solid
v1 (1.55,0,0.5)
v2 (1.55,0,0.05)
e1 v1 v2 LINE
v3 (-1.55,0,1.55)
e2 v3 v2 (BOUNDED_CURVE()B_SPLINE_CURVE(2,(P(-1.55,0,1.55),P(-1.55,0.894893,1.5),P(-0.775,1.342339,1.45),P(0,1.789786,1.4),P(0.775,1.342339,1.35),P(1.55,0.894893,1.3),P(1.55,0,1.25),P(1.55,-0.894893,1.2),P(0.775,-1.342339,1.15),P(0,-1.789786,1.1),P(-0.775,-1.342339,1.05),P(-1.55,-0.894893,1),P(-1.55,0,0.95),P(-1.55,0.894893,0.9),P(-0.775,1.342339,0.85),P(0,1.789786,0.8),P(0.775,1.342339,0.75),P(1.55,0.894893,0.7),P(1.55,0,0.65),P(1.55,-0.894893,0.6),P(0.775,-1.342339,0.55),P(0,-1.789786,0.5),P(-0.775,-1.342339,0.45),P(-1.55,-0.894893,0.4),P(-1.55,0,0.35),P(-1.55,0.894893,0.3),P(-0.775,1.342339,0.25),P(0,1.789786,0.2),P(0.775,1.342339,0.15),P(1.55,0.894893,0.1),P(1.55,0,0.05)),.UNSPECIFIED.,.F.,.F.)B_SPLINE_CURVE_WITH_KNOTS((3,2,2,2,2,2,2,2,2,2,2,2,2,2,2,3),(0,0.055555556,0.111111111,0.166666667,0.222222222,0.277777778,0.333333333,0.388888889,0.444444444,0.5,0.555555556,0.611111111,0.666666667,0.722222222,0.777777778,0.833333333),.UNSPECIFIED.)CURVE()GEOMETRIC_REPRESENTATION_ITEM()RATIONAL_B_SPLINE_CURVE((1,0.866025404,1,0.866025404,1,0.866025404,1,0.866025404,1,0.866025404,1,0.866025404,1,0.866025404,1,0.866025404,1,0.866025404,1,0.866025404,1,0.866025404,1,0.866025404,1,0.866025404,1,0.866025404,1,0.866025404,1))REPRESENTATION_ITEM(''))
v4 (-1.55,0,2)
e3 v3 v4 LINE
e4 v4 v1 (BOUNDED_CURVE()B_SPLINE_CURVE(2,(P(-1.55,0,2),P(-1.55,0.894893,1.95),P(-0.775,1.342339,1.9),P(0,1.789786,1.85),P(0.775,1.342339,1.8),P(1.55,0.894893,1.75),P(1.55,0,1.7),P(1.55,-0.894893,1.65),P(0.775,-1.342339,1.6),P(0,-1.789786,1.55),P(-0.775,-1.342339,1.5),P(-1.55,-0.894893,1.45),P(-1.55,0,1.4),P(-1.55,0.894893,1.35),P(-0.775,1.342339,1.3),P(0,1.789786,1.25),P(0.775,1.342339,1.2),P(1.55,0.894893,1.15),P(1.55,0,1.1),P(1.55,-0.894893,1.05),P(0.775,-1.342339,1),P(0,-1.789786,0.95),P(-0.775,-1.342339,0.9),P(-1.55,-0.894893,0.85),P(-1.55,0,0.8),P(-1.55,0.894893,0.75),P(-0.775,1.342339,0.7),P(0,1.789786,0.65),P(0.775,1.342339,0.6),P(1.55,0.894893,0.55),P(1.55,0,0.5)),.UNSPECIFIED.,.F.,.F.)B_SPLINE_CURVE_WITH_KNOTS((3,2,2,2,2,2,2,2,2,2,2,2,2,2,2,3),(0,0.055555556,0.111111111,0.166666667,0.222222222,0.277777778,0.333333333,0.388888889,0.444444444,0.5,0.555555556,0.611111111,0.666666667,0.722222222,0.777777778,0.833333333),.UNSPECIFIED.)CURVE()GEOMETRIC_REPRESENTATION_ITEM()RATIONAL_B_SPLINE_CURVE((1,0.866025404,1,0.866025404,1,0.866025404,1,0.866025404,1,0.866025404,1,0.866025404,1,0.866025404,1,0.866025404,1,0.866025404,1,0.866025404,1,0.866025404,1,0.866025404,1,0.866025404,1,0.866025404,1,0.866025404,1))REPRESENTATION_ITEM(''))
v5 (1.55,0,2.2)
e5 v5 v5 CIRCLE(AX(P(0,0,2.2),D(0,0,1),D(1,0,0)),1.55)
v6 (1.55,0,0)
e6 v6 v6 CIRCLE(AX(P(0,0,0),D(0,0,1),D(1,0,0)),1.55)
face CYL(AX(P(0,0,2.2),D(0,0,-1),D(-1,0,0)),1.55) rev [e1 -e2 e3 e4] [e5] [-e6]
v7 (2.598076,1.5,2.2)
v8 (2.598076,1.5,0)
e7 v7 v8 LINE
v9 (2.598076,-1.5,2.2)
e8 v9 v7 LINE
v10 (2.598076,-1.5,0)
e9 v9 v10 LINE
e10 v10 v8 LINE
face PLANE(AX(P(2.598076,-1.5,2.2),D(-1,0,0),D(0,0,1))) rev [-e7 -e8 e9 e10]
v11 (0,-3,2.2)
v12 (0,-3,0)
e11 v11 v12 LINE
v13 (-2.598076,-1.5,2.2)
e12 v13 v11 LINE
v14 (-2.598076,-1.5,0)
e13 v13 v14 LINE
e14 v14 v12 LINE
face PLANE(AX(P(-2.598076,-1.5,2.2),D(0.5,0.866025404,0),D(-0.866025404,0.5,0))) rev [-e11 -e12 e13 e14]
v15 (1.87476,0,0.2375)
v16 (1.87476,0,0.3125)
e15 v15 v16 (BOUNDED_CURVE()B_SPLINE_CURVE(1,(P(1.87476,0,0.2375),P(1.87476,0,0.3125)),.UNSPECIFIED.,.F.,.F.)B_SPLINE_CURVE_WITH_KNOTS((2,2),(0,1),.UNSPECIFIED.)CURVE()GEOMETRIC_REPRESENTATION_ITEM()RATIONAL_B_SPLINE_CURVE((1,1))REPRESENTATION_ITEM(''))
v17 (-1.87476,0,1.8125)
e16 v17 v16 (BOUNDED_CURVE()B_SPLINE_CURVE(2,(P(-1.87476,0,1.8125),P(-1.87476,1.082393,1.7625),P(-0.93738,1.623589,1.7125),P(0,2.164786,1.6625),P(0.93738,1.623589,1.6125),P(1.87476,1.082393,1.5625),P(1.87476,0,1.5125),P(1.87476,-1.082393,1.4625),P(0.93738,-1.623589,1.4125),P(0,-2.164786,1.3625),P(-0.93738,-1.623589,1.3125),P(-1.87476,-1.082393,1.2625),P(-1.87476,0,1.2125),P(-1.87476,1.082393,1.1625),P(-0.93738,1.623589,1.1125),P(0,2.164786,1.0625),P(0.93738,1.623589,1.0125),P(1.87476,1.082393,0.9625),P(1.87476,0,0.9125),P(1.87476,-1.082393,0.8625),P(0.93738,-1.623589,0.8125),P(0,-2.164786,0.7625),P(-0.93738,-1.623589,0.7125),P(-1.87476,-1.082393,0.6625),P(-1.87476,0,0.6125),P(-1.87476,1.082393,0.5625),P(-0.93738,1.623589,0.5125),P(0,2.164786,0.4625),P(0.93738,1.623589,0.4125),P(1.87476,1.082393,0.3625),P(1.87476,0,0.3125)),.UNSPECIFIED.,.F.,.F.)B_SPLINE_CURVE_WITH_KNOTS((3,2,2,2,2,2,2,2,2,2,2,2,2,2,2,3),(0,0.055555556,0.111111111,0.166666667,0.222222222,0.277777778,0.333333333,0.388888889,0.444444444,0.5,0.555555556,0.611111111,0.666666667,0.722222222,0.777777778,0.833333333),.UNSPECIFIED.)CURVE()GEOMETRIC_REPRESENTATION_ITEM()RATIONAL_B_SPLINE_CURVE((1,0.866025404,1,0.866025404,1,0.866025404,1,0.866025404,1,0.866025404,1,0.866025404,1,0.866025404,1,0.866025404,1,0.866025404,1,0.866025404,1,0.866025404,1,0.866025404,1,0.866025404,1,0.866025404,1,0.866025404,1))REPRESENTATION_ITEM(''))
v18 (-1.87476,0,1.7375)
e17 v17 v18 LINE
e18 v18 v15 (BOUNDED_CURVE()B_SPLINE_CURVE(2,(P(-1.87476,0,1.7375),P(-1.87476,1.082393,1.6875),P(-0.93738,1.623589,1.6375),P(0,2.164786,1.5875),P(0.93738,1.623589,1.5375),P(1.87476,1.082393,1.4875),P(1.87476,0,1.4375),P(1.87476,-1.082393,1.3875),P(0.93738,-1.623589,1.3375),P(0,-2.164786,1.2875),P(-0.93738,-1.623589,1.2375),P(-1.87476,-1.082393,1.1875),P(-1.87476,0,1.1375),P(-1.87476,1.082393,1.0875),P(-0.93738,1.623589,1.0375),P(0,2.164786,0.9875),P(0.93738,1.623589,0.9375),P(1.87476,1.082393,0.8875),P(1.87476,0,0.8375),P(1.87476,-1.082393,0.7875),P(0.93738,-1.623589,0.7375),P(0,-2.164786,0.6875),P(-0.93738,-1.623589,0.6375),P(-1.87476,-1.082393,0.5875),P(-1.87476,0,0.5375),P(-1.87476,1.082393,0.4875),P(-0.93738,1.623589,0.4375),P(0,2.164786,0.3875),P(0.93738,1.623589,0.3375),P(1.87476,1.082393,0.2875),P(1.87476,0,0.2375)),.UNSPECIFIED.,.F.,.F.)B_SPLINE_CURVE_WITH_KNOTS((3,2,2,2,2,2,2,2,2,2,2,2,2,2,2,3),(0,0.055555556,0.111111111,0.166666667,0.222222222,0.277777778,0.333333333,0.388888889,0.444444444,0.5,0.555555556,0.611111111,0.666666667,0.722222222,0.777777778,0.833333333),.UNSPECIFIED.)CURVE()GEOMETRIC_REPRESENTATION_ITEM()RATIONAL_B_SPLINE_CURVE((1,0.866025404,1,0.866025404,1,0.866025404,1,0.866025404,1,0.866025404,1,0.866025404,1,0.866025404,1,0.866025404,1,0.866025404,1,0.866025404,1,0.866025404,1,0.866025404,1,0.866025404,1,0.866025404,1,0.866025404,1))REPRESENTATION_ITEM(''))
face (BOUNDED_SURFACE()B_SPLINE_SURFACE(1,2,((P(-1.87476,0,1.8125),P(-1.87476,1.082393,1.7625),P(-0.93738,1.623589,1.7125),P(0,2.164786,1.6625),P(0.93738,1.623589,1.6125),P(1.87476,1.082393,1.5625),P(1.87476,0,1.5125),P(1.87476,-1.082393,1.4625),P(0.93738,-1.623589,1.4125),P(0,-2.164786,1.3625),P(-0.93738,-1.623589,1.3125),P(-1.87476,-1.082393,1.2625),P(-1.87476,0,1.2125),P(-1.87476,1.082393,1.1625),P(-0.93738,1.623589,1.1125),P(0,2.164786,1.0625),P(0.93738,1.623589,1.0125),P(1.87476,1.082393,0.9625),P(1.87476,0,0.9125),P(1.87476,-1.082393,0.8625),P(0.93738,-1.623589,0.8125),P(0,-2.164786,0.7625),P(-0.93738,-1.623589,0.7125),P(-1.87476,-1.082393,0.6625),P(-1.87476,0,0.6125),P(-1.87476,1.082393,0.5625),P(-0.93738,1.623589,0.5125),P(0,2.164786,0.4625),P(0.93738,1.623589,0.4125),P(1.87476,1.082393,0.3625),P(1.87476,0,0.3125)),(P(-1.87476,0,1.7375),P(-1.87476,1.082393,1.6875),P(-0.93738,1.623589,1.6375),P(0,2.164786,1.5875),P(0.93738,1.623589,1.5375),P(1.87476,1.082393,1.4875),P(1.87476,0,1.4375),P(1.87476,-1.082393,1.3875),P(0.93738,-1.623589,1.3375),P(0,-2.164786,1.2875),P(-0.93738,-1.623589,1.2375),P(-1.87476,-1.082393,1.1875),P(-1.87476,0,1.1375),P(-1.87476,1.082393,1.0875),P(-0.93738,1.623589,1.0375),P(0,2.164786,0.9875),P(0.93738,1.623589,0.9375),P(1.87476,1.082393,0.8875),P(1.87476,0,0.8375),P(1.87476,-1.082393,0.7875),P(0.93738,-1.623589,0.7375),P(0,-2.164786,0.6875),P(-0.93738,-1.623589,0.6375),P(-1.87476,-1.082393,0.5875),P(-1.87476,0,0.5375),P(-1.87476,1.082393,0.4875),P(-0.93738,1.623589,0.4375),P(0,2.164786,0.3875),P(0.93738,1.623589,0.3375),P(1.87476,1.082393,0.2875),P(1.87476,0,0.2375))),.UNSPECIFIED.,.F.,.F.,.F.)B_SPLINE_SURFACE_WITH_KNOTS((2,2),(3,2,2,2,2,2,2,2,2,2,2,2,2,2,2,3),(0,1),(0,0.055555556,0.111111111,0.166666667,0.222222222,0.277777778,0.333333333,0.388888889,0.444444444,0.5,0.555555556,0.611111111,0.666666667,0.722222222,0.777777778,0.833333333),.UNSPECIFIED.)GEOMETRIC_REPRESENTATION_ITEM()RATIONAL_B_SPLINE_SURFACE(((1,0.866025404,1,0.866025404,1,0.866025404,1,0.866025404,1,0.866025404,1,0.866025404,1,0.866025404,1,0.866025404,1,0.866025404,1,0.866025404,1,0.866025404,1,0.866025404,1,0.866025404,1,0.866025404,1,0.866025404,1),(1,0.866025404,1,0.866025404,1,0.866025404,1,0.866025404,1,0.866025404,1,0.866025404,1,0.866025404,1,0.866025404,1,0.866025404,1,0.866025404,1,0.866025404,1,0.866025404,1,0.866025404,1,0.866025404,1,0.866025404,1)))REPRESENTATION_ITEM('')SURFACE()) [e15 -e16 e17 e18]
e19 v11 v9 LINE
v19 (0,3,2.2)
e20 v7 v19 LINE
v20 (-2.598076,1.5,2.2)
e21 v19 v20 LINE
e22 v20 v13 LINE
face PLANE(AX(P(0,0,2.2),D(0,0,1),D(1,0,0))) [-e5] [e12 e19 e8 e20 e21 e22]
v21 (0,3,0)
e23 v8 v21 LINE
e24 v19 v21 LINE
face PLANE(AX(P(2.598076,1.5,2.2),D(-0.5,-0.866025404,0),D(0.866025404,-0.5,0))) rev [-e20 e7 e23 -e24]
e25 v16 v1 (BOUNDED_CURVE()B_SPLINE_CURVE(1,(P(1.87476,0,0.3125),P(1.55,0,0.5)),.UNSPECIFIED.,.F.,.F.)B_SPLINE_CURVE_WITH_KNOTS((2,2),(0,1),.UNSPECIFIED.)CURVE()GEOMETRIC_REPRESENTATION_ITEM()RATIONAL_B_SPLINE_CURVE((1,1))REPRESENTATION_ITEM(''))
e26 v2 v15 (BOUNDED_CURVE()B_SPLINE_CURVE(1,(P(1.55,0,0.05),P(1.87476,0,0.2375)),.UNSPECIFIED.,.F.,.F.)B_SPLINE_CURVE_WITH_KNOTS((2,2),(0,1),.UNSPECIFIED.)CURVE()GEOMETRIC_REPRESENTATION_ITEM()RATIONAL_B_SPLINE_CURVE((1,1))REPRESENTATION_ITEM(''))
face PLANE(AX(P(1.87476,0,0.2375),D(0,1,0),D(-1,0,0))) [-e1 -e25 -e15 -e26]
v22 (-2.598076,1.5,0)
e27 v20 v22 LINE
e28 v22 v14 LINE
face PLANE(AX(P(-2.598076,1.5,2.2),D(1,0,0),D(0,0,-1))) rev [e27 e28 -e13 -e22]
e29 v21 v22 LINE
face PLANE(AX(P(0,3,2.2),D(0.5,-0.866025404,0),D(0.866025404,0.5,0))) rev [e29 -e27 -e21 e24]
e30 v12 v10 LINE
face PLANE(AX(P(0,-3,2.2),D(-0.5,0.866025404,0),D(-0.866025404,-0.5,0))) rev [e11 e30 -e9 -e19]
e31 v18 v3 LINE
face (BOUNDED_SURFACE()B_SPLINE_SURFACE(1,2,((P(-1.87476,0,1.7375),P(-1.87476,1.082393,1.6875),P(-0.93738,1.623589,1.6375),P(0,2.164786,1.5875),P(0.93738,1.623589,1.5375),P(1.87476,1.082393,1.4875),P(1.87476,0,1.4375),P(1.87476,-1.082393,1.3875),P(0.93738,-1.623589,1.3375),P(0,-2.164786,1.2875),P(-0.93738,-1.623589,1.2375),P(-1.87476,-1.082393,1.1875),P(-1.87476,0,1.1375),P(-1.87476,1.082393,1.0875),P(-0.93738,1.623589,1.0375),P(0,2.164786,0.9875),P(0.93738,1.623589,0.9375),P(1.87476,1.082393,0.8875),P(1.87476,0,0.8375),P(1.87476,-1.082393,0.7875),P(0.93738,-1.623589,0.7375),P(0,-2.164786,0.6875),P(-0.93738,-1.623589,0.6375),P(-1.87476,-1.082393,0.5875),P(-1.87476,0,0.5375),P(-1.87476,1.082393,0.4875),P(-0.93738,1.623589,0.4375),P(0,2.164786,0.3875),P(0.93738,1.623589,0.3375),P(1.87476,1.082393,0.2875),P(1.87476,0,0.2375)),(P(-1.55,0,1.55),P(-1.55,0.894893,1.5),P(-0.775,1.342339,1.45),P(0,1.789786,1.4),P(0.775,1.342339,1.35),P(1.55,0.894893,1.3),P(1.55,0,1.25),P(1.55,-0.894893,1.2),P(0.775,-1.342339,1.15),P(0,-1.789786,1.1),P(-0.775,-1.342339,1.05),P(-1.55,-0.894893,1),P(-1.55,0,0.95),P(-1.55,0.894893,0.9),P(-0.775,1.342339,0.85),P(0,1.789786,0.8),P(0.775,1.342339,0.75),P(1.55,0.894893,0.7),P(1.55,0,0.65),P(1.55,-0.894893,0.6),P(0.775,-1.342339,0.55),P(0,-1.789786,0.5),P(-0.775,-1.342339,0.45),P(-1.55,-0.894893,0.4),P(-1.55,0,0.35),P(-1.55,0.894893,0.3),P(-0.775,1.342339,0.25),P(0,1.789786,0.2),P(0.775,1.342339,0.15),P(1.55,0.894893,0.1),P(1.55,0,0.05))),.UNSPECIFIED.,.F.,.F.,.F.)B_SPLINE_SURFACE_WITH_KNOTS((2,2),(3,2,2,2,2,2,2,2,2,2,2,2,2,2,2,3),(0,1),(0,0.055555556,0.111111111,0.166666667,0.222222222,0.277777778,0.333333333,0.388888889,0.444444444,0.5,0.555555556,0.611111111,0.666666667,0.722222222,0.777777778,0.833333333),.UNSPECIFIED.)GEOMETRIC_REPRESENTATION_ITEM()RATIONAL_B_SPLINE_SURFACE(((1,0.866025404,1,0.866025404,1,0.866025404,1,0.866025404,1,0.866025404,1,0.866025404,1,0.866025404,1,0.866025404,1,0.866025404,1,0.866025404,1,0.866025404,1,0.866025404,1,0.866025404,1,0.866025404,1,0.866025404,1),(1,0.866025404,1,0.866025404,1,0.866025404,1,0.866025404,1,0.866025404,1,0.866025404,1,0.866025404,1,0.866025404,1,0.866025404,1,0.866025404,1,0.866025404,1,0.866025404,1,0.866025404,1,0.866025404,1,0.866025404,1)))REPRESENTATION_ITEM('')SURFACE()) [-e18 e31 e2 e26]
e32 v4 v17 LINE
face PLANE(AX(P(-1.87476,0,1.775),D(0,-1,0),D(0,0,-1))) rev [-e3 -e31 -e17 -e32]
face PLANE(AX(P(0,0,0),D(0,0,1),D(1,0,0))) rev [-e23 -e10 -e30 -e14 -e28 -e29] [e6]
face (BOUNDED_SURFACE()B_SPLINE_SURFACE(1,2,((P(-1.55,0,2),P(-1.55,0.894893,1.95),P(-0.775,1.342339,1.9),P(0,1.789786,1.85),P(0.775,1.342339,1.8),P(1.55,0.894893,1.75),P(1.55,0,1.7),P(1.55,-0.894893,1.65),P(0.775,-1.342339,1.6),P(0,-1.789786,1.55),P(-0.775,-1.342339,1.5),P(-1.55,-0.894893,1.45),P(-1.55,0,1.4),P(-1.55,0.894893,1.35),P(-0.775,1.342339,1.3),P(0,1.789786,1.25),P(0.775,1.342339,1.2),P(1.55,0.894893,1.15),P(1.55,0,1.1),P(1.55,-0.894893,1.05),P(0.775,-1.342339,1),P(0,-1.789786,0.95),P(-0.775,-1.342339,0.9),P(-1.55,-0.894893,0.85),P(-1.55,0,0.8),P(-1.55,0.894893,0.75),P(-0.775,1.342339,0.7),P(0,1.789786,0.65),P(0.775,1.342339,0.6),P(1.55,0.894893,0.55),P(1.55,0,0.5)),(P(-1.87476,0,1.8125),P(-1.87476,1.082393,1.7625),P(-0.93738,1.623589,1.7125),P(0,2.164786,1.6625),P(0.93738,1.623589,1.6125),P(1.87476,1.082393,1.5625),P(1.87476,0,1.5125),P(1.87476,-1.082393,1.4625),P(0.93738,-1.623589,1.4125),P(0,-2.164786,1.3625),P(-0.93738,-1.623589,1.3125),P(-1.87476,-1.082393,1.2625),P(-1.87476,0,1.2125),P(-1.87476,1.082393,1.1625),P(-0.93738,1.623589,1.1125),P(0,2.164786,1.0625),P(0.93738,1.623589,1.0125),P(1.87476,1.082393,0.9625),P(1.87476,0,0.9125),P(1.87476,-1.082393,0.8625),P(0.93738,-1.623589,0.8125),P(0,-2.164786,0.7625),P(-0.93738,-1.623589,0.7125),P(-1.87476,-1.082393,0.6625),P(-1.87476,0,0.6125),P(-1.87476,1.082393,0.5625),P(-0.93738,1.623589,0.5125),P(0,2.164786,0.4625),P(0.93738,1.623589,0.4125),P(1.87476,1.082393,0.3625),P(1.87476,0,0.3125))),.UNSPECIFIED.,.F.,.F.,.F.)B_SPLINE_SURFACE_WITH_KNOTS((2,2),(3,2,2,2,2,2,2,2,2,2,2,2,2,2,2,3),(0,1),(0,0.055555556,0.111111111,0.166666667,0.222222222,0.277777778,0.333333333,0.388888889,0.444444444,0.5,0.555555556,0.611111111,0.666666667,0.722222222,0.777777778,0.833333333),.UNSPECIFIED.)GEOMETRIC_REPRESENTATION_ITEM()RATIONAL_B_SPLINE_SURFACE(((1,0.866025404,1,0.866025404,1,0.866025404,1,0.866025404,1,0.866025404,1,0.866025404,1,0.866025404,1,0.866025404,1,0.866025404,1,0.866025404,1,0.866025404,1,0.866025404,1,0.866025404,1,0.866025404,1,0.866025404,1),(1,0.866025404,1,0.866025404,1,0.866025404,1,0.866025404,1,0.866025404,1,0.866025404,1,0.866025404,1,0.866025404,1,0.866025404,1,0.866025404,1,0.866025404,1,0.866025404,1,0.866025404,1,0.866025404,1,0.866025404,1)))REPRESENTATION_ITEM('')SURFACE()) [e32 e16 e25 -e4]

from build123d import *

# Parameters (mm, degrees)
SKETCH1_R           = 1.55
BOSS_EXTRUDE1_DEPTH = 2.2
THREAD1_PITCH       = 0.6


with BuildPart() as part:
    # Sketch1 → Boss-Extrude1 (new body)
    with BuildSketch(Plane.XY):
        Polygon((-2.598076211, -1.5), (0, -3), (2.598076211, -1.5), (2.598076211, 1.5), (0, 3), (-2.598076211, 1.5), align=None)
        Circle(SKETCH1_R, mode=Mode.SUBTRACT)
    extrude(amount=BOSS_EXTRUDE1_DEPTH)

    # Thread1: the profile of Thread Profile1 profile screwed along a right-hand helix of 2.5 turns, 6 arcs to a turn; built about Z, then put on its axis
    thread1_z = Axis((0, 0, 0), (0, 0, 1))
    thread1_corners = [(1.5497, 0, -0.000173205), (1.874759525, 0, 0.187499999), (1.874759525, 0, 0.262499999), (1.5497, 0, 0.450173203)]
    with BuildLine(mode=Mode.PRIVATE) as thread1_profile:
        Line(thread1_corners[0], thread1_corners[1])
        Line(thread1_corners[1], thread1_corners[2])
        Line(thread1_corners[2], thread1_corners[3])
        Line(thread1_corners[3], thread1_corners[0])
    thread1_cap = Face(thread1_profile.wire())
    thread1_turn_angles = [0, 30, 60, 90, 120, 150, 180, 210, 240, 270, 300, 330, 360]
    thread1_turn_weights = [1, 0.8660254037844387, 1, 0.8660254037844387, 1, 0.8660254037844387, 1, 0.8660254037844387, 1, 0.8660254037844387, 1, 0.8660254037844387, 1]
    thread1_turn_rails = [Edge.make_bspline([Vector(p[0], p[1], 0).rotate(thread1_z, thread1_turn_angles[k]) / thread1_turn_weights[k] + Vector(0, 0, p[2] + THREAD1_PITCH * thread1_turn_angles[k] / 360) for k in range(13)], [0, 0, 0, 1, 1, 2, 2, 3, 3, 4, 4, 5, 5, 6, 6, 6], 2, thread1_turn_weights) for p in thread1_corners]
    thread1_turn_sides = [Face.make_surface_from_curves(thread1_turn_rails[p[0]], thread1_turn_rails[p[1]]) for p in [(0, 1), (1, 2), (2, 3), (3, 0)]]
    thread1_last_angles = [720, 750, 780, 810, 840, 870, 900]
    thread1_last_weights = [1, 0.8660254037844387, 1, 0.8660254037844387, 1, 0.8660254037844387, 1]
    thread1_last_rails = [Edge.make_bspline([Vector(p[0], p[1], 0).rotate(thread1_z, thread1_last_angles[k]) / thread1_last_weights[k] + Vector(0, 0, p[2] + THREAD1_PITCH * thread1_last_angles[k] / 360) for k in range(7)], [0, 0, 0, 1, 1, 2, 2, 3, 3, 3], 2, thread1_last_weights) for p in thread1_corners]
    thread1_last_sides = [Face.make_surface_from_curves(thread1_last_rails[p[0]], thread1_last_rails[p[1]]) for p in [(0, 1), (1, 2), (2, 3), (3, 0)]]
    thread1 = Plane(origin=(0, 0, 2), x_dir=(-1, 0, 0), z_dir=(0, 0, -1)) * Solid(Shell([*[p.moved(Location((0, 0, THREAD1_PITCH * i))) for i in range(2) for p in thread1_turn_sides], *thread1_last_sides, thread1_cap, thread1_cap.rotate(thread1_z, 900).moved(Location((0, 0, THREAD1_PITCH * 900 / 360)))]))
    add(thread1, mode=Mode.SUBTRACT)


solid = part.part
